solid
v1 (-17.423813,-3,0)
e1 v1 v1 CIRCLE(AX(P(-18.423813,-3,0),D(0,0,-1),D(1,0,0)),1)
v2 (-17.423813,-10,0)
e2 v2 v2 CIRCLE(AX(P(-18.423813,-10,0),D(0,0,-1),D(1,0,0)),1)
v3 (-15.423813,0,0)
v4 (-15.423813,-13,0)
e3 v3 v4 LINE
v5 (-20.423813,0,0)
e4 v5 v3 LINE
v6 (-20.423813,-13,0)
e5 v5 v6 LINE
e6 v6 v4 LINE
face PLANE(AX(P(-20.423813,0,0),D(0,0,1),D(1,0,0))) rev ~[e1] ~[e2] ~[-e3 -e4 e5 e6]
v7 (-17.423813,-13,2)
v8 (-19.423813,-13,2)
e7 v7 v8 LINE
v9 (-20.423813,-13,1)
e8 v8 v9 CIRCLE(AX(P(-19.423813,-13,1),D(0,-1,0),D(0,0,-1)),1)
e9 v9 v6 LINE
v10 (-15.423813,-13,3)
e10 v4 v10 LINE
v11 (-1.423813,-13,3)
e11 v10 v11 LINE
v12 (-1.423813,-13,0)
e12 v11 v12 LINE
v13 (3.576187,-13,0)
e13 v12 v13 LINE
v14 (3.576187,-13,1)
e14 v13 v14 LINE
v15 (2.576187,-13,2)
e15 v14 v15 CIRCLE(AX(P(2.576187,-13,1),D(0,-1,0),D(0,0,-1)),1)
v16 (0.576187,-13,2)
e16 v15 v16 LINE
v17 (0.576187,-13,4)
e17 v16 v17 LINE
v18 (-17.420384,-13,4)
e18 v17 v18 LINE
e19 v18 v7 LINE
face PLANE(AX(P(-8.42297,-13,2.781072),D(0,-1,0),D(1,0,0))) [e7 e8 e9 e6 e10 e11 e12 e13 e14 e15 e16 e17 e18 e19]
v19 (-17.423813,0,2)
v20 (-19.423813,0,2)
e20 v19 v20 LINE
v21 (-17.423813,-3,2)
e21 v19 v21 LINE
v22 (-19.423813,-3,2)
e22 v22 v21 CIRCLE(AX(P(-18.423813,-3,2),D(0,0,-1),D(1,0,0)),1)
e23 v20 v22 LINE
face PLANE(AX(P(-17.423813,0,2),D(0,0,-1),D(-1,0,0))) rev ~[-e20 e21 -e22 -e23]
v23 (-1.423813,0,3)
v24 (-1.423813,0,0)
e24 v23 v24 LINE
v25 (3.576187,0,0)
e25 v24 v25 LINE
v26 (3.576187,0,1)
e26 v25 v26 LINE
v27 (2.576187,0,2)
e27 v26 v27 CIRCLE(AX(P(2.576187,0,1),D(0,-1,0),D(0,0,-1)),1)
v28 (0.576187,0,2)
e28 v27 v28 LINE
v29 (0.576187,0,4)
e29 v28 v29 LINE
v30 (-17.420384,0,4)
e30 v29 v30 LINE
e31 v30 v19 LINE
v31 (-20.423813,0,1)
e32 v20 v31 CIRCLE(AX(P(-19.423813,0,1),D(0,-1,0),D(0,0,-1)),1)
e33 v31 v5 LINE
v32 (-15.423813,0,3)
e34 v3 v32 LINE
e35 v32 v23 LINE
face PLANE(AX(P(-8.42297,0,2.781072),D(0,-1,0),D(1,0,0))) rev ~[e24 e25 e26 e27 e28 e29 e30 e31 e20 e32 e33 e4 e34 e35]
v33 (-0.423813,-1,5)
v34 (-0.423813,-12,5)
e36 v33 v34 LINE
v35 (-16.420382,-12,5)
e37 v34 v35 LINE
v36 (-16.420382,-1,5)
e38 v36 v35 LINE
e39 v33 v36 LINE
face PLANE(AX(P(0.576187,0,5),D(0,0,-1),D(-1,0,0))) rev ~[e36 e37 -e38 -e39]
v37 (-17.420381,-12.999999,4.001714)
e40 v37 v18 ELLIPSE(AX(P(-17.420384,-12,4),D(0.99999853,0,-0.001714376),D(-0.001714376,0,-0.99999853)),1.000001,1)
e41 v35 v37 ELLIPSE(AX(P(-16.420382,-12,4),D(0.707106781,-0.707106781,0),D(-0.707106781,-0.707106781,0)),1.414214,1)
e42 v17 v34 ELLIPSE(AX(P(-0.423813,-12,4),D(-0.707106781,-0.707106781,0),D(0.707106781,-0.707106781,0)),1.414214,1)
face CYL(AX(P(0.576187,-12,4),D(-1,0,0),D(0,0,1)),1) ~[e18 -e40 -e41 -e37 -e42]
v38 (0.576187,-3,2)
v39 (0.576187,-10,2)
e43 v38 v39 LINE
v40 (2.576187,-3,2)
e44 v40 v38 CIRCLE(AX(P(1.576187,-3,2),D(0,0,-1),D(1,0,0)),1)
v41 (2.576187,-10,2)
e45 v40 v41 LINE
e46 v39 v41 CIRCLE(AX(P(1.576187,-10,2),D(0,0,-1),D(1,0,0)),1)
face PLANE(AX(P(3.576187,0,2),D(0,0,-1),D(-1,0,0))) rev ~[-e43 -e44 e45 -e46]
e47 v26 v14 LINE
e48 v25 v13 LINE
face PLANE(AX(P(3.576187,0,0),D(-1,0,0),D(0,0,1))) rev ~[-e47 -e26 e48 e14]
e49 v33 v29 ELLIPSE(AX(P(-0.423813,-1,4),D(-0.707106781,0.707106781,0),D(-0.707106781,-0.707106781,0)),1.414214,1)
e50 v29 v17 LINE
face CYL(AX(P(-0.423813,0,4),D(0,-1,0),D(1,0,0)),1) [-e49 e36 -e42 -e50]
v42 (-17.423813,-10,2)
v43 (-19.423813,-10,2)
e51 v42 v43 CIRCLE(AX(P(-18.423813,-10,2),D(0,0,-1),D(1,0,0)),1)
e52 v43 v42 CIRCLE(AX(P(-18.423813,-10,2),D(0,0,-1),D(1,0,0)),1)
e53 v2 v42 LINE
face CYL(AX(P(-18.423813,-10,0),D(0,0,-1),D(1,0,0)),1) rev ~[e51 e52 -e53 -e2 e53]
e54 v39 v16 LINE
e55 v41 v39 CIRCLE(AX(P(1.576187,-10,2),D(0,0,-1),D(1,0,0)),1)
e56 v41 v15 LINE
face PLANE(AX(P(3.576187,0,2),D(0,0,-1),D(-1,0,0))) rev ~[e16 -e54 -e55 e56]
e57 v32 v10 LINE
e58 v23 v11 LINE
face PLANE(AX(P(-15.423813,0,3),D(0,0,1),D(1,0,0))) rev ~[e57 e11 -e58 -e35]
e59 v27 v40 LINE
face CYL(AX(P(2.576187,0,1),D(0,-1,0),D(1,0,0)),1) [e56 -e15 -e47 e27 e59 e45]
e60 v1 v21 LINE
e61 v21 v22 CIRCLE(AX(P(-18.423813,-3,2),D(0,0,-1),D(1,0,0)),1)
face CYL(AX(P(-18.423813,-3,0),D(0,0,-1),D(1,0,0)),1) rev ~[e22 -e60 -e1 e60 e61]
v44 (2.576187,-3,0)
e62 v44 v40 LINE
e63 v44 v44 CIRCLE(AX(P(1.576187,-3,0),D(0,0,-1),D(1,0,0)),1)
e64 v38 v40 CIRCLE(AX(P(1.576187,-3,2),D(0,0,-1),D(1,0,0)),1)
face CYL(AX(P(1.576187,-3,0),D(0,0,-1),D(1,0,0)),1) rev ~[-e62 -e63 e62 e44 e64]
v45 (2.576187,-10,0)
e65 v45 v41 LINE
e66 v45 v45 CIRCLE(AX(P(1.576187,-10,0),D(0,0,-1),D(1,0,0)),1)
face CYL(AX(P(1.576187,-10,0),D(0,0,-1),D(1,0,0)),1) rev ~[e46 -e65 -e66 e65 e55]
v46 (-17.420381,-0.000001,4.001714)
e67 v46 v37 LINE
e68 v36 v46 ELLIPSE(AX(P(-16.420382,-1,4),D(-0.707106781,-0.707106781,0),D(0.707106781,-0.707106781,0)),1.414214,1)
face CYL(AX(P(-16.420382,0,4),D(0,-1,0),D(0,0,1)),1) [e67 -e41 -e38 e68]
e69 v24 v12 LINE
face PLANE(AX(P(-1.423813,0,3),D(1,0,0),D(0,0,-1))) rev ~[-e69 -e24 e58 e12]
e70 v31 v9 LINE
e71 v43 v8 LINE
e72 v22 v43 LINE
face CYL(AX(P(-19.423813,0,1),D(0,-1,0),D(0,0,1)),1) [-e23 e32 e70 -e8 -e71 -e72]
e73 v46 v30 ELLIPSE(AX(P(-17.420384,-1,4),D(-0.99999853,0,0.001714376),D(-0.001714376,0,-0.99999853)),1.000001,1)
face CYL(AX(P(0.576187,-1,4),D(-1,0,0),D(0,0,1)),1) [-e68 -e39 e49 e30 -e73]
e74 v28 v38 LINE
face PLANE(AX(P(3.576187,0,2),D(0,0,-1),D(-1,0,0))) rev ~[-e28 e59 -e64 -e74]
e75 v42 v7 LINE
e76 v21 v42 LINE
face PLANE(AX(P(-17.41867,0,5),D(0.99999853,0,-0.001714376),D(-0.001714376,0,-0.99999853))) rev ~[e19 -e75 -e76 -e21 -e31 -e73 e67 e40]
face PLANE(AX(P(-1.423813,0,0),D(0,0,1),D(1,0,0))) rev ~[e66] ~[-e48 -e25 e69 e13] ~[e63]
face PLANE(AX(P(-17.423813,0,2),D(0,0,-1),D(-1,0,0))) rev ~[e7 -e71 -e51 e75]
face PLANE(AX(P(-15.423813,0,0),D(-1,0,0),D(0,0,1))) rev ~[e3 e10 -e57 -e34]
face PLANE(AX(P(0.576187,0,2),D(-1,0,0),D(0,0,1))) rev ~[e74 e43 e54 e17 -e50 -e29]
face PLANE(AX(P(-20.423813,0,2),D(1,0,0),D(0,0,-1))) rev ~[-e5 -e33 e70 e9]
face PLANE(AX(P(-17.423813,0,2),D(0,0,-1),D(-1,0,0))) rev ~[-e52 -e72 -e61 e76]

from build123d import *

# Parameters (mm, degrees)
F1_DEPTH = 13
F2_R     = 1
F3_R     = 1
F4_DEPTH = 25
F5_R     = 1
F6_DEPTH = 25


with BuildPart() as f1:
    # F0 (on Front) → F1 (new body)
    with BuildSketch(Plane.XZ):
        Polygon((-20.4238126724, 0), (-18.61380395, 0), (-15.4238126724, 0), (-15.4238126724, 3), (-1.4238126724, 3), (-1.4238126724, 0), (3.5761873276, 0), (3.5761873276, 2), (0.5761873276, 2), (0.5761873276, 5), (-17.4186695367, 5), (-17.4238126724, 2), (-20.4238126724, 2), align=None)
    extrude(amount=F1_DEPTH)

    # F2
    f2_edges = [f1.edges().sort_by_distance(p)[0] for p in [
        (-8.421241, 0, 5),
        (0.576187, -6.5, 5),
        (-17.41867, -6.5, 5),
        (-8.421241, -13, 5),
        (3.576187, -6.5, 2),
        (-20.423813, -6.5, 2),
    ]]
    fillet(f2_edges, radius=F2_R)

    # F3 (on face) → F4 (cut)
    with BuildSketch(Plane(origin=(0, 0, 0), x_dir=(1, 0, 0), z_dir=(0, 0, -1))):
        with Locations((-18.4238126724, 10)):
            Circle(F3_R)
        with Locations((-18.4238126724, 3)):
            Circle(F3_R)
    extrude(amount=-F4_DEPTH, mode=Mode.SUBTRACT)

    # F5 (on face) → F6 (cut)
    with BuildSketch(Plane(origin=(0, 0, 0), x_dir=(1, 0, 0), z_dir=(0, 0, -1))):
        with Locations((1.5761873276, 10)):
            Circle(F5_R)
        with Locations((1.5761873276, 3)):
            Circle(F5_R)
    extrude(amount=-F6_DEPTH, mode=Mode.SUBTRACT)


solid = f1.part
